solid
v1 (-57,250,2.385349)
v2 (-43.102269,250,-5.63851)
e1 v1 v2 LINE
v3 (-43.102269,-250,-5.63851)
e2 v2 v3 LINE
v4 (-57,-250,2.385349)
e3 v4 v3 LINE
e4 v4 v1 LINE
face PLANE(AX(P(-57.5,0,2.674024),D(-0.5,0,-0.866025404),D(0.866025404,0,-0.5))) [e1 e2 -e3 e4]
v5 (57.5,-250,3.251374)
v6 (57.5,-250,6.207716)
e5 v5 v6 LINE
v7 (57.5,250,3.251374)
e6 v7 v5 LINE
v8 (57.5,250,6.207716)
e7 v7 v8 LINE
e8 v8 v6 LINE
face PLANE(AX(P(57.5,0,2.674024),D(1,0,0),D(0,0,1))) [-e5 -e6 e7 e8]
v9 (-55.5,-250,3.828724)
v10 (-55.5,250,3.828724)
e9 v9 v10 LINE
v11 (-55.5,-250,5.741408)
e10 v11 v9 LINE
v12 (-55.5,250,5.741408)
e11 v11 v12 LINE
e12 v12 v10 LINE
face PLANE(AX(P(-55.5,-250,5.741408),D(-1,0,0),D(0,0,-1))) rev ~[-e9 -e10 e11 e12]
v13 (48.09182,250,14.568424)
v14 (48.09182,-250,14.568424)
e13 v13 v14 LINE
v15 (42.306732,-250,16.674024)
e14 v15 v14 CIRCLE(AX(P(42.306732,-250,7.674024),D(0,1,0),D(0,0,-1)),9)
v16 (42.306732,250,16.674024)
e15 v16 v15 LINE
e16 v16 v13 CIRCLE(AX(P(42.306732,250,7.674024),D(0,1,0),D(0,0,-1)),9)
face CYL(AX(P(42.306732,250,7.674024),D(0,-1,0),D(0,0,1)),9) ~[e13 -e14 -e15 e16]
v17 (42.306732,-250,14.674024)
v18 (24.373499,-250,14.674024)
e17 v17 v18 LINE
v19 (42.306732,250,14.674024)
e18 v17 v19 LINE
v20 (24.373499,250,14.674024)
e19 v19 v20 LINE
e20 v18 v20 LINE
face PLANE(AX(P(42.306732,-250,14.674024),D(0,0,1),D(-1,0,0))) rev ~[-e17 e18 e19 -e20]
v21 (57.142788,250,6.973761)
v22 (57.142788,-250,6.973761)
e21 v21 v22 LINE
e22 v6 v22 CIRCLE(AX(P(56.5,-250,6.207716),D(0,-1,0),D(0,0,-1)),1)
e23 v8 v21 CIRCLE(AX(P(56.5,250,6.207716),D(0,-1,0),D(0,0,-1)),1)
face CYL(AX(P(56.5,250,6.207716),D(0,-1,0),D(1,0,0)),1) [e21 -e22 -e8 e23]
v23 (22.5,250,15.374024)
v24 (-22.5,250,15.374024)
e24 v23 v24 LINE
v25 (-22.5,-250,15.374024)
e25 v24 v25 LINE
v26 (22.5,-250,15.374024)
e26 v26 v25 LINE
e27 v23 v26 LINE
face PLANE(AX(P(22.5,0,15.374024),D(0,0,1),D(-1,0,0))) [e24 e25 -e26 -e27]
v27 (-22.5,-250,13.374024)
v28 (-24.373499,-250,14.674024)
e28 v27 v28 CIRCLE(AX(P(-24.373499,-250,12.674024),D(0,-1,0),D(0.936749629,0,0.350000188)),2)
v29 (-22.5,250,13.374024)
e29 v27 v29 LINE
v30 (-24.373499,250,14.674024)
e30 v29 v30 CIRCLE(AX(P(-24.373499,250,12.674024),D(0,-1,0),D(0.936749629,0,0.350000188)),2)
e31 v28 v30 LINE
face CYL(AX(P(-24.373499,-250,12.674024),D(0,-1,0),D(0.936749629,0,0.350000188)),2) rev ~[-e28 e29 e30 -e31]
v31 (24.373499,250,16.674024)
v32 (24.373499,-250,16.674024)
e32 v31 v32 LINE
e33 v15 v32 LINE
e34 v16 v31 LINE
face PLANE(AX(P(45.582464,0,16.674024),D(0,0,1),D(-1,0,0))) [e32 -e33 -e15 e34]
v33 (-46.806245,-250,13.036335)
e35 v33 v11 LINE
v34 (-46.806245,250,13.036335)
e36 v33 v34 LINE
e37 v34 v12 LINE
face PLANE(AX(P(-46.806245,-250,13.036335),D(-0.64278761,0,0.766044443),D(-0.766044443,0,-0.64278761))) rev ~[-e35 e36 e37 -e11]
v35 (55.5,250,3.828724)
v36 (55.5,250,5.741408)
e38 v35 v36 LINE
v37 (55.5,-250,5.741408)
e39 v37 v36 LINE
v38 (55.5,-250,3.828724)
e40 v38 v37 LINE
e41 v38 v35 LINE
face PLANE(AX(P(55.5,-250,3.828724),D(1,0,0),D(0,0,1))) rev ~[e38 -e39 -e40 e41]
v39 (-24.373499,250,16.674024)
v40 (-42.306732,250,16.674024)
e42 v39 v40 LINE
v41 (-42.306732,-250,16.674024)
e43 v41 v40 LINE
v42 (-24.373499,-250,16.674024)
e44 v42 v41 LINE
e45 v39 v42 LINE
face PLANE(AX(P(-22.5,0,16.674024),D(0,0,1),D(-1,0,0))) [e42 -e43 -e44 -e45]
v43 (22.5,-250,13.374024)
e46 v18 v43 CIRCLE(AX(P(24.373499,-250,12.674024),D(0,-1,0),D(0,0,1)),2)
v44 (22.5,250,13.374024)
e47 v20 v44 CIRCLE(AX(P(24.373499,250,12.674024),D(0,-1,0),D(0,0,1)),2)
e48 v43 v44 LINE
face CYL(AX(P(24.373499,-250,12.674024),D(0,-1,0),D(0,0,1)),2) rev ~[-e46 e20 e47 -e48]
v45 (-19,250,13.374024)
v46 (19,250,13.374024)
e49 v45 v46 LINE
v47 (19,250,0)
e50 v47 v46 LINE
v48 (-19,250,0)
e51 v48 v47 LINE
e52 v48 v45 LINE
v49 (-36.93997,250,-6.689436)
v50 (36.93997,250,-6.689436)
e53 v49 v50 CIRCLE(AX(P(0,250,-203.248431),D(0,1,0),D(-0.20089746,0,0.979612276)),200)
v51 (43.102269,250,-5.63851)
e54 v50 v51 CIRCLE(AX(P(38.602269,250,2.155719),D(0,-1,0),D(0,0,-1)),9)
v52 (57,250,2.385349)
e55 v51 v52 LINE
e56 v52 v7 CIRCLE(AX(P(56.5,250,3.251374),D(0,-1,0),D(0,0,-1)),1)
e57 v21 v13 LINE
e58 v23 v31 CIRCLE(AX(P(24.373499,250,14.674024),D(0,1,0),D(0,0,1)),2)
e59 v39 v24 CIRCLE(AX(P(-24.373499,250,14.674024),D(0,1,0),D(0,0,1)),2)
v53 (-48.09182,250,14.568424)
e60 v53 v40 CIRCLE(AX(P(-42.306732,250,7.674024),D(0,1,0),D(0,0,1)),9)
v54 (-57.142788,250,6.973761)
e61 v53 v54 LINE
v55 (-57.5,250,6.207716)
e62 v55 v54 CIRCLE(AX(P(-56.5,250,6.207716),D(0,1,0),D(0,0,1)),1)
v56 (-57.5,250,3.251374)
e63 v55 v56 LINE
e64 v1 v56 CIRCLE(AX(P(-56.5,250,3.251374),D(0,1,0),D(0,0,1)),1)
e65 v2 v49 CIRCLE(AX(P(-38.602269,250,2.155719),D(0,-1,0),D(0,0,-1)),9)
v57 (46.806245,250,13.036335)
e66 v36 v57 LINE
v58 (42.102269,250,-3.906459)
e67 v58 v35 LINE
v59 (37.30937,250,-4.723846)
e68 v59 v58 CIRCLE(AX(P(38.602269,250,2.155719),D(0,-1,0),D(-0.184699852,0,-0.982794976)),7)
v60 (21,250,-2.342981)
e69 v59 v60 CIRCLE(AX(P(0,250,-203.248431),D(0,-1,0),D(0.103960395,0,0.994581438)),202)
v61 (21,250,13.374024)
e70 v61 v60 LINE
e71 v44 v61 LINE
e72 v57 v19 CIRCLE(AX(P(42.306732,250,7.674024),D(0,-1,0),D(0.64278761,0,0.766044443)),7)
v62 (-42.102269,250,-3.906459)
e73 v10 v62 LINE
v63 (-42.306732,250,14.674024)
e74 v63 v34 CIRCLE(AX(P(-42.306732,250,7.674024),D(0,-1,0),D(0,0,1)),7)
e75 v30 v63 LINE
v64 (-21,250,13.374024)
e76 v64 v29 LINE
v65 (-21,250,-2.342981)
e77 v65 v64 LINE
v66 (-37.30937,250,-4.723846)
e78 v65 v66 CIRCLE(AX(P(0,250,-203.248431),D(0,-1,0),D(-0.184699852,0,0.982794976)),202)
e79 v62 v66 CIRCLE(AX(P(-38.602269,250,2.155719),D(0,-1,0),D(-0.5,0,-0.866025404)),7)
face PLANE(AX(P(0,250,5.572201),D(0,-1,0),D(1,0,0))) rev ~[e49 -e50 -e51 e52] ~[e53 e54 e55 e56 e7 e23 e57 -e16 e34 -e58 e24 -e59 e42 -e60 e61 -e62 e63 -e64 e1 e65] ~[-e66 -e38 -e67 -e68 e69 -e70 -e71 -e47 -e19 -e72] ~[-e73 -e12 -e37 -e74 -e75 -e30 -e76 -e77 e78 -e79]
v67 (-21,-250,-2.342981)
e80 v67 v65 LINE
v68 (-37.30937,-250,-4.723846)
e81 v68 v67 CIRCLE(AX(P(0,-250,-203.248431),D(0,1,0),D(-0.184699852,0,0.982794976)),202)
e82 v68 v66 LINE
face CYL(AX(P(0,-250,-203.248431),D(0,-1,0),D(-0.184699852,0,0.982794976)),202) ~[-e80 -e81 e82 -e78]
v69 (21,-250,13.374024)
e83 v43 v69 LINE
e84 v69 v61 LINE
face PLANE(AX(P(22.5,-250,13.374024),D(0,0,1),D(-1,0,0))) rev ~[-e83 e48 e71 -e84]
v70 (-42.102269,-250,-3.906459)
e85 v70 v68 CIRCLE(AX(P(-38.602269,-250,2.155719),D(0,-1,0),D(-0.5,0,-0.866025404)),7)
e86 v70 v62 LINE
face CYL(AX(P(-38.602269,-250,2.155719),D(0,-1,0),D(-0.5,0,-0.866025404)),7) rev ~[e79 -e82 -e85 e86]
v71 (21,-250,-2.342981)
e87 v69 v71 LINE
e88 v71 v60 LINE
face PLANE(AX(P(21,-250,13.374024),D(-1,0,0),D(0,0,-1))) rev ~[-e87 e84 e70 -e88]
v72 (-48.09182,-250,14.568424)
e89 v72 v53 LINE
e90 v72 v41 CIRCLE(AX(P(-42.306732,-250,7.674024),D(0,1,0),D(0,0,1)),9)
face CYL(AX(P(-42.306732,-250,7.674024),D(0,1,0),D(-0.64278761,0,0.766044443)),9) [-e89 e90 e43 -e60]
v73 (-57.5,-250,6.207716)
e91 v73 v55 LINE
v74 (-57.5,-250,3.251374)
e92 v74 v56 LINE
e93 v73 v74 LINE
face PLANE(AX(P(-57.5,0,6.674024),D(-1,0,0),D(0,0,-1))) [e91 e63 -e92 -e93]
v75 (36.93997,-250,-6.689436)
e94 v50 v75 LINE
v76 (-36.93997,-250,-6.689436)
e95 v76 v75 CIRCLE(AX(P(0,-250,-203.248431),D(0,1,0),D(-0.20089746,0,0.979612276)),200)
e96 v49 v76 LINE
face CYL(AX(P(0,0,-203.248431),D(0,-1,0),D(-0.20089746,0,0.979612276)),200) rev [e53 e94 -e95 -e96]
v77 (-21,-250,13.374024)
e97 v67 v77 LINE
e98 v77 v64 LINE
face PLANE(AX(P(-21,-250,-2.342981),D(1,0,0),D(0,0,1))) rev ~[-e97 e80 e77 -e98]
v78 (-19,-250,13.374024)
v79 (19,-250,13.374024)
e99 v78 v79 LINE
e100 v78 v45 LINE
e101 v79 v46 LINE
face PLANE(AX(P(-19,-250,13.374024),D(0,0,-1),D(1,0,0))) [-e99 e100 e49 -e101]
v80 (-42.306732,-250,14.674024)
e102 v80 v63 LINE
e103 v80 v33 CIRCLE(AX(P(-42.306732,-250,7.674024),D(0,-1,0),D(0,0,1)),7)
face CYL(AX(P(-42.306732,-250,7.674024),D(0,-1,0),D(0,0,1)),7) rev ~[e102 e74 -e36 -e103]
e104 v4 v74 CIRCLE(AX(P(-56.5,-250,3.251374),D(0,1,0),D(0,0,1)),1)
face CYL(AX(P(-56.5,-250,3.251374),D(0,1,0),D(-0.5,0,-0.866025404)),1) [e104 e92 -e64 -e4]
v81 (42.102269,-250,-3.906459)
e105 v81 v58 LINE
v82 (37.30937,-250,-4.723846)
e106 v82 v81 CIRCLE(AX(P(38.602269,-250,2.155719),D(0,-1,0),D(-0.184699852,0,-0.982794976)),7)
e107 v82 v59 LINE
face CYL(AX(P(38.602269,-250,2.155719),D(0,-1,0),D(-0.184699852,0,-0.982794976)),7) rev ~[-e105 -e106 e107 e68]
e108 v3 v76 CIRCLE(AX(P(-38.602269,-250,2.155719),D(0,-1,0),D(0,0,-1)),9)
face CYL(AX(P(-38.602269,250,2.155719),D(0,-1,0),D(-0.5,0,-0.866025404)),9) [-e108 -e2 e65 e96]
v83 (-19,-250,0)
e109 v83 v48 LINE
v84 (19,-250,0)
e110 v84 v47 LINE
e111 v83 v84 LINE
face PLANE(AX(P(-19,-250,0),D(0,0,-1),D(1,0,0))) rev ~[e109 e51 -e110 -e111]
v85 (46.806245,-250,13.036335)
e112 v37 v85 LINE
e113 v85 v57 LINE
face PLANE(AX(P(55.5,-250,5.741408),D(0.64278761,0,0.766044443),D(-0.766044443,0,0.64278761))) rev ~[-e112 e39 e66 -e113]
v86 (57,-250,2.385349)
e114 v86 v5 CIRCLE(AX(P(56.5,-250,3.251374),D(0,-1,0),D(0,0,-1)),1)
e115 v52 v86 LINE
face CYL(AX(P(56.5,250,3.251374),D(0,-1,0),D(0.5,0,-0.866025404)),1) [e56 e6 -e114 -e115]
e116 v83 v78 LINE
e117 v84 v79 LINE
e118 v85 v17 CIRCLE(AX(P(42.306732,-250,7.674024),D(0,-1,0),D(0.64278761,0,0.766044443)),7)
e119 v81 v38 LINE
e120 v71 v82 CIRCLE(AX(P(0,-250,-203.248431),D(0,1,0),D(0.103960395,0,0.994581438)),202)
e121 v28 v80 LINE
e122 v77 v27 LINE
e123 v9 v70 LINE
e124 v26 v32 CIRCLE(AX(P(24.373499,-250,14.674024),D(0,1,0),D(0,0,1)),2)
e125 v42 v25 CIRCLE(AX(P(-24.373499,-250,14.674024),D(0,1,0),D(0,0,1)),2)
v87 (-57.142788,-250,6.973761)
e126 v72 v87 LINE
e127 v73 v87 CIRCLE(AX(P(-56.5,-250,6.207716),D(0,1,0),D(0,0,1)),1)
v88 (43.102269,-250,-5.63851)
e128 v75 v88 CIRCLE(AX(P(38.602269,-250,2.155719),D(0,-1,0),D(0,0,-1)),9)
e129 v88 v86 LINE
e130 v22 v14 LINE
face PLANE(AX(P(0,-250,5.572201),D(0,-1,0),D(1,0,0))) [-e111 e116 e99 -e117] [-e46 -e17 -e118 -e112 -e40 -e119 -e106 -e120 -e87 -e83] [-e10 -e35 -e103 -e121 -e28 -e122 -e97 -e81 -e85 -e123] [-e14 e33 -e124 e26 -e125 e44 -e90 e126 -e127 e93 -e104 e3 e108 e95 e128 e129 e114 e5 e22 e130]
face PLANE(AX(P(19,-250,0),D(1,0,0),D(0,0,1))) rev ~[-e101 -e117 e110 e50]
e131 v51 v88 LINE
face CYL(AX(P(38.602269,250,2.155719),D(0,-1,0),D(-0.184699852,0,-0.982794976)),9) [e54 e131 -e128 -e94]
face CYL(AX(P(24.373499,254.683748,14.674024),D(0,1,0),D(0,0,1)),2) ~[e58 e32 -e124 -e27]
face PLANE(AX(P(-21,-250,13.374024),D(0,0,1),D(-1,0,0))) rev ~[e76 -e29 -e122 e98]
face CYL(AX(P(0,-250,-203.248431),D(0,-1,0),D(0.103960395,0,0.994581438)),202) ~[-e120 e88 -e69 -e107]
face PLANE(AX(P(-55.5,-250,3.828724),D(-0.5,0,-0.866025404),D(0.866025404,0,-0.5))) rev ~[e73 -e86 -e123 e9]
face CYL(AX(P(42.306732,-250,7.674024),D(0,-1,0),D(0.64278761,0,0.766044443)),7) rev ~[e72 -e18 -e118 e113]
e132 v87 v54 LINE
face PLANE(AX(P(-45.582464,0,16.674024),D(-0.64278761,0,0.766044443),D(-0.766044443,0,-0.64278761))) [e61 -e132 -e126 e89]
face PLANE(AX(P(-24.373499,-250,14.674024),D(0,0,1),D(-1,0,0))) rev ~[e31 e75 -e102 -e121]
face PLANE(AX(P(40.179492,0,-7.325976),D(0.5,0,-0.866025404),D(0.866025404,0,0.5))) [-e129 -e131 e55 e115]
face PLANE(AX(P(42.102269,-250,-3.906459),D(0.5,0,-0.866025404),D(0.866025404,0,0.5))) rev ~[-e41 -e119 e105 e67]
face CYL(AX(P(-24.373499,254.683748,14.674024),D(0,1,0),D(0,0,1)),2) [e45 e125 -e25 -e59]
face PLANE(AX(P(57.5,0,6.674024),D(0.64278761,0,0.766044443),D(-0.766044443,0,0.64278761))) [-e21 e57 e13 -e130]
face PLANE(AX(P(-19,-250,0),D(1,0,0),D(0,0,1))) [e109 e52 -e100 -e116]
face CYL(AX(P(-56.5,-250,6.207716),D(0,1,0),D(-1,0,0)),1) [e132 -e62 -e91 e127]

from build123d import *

# Parameters (mm, degrees)
F1_DEPTH    = 250
F2_W        = 38
F2_H        = 13.3740238536
F3_DEPTH    = 1200
F4_T1_DEPTH = 509.3674969976
F5_R        = 9
F6_R        = 1
F8_DEPTH    = 500.001


# Not quite as in the source:
# - a fillet or chamfer that OpenCascade refuses, or shapes differently, is made with other operations: its cross-section is extruded or revolved along the edge and cut away or added


with BuildPart() as f1:
    # F0 (on Front) → F1 (new body, symmetric)
    with BuildSketch(Plane.XZ):
        with BuildLine():
            Line((-57.5, 2.6740238536), (-40.1794919243, -7.3259761464))
            ThreePointArc((-40.1794919243, -7.3259761464), (0, -3.248431288), (40.1794919243, -7.3259761464))
            Line((40.1794919243, -7.3259761464), (57.5, 2.6740238536))
            Line((57.5, 2.6740238536), (57.5, 6.6740238536))
            Line((57.5, 6.6740238536), (45.5824640741, 16.6740238536))
            Line((45.5824640741, 16.6740238536), (22.5, 16.6740238536))
            Line((22.5, 16.6740238536), (22.5, 15.3740238536))
            Line((22.5, 15.3740238536), (0, 15.3740238536))
            Line((0, 15.3740238536), (-22.5, 15.3740238536))
            Line((-22.5, 15.3740238536), (-22.5, 16.6740238536))
            Line((-22.5, 16.6740238536), (-45.5824640741, 16.6740238536))
            Line((-45.5824640741, 16.6740238536), (-57.5, 6.6740238536))
            Line((-57.5, 6.6740238536), (-57.5, 2.6740238536))
        make_face()
    extrude(amount=F1_DEPTH, both=True)

    # F2 (on face) → F3 (cut)
    with BuildSketch(Plane.XZ.offset(250)):
        with Locations((0, 6.6870119268)):
            Rectangle(F2_W, F2_H)
    extrude(amount=-F3_DEPTH, mode=Mode.SUBTRACT)

    # F4: fillet of radius 2 on 2 edges, made by hand

    # F4_s2 → F4_t1 (cut)
    with BuildSketch(Plane.XZ.offset(-254.6837484988)):
        with BuildLine():
            ThreePointArc((-24.3734993995, 16.6740238536), (-23.2333239744, 16.3171915261), (-22.5, 15.3740238536))
            Line((-22.5, 15.3740238536), (-22.5, 16.6740238536))
            Line((-22.5, 16.6740238536), (-24.3734993995, 16.6740238536))
        make_face()
        with BuildLine():
            ThreePointArc((24.3734993995, 16.6740238536), (23.2333239744, 16.3171915261), (22.5, 15.3740238536))
            Line((22.5, 15.3740238536), (22.5, 16.6740238536))
            Line((22.5, 16.6740238536), (24.3734993995, 16.6740238536))
        make_face()
    extrude(amount=F4_T1_DEPTH, mode=Mode.SUBTRACT)

    # F5
    f5_edges = [f1.edges().sort_by_distance(p)[0] for p in [
        (45.582464, 0, 16.674024),
        (40.179492, 0, -7.325976),
        (-45.582464, 0, 16.674024),
        (-40.179492, 0, -7.325976),
    ]]
    fillet(f5_edges, radius=F5_R)

    # F6
    f6_edges = [f1.edges().sort_by_distance(p)[0] for p in [
        (-57.5, 0, 6.674024),
        (-57.5, 0, 2.674024),
        (57.5, 0, 6.674024),
        (57.5, 0, 2.674024),
    ]]
    fillet(f6_edges, radius=F6_R)

    # F7 (on face) → F8 (cut, through all)
    with BuildSketch(Plane.XZ.offset(250)):
        with BuildLine():
            ThreePointArc((-42.102269028, -3.9064590428), (-39.7790673217, -4.7446540804), (-37.3093701512, -4.7238460325))
            ThreePointArc((-37.3093701512, -4.7238460325), (-29.178978452, -3.3669982622), (-20.9999997169, -2.3429807302))
            Line((-20.9999997169, -2.3429807302), (-20.9999997169, 13.3740240708))
            Line((-20.9999997169, 13.3740240708), (-22.500000096, 13.3740240708))
            ThreePointArc((-22.500000096, 13.3740240708), (-23.2333241124, 14.3171915037), (-24.3734993995, 14.6740237251))
            Line((-24.3734993995, 14.6740237251), (-42.3067319657, 14.6740237251))
            ThreePointArc((-42.3067319657, 14.6740237251), (-44.700872925, 14.2518720783), (-46.8062451509, 13.036334857))
            Line((-46.8062451509, 13.036334857), (-55.4999998715, 5.7414084774))
            Line((-55.4999998715, 5.7414084774), (-55.4999998715, 3.8287244662))
            Line((-55.4999998715, 3.8287244662), (-42.102269028, -3.9064590428))
        make_face()
        with BuildLine():
            ThreePointArc((24.3734993995, 14.6740237251), (23.2333241124, 14.3171915037), (22.500000096, 13.3740240708))
            Line((22.500000096, 13.3740240708), (20.9999997169, 13.3740240708))
            Line((20.9999997169, 13.3740240708), (20.9999997169, -2.3429807302))
            ThreePointArc((20.9999997169, -2.3429807302), (29.178978452, -3.3669982622), (37.3093701512, -4.7238460325))
            ThreePointArc((37.3093701512, -4.7238460325), (39.7790673217, -4.7446540804), (42.102269028, -3.9064590428))
            Line((42.102269028, -3.9064590428), (55.4999998715, 3.8287244662))
            Line((55.4999998715, 3.8287244662), (55.4999998715, 5.7414084774))
            Line((55.4999998715, 5.7414084774), (46.8062451509, 13.036334857))
            ThreePointArc((46.8062451509, 13.036334857), (44.700872925, 14.2518720783), (42.3067319657, 14.6740237251))
            Line((42.3067319657, 14.6740237251), (24.3734993995, 14.6740237251))
        make_face()
    extrude(amount=-F8_DEPTH, mode=Mode.SUBTRACT)


solid = f1.part
